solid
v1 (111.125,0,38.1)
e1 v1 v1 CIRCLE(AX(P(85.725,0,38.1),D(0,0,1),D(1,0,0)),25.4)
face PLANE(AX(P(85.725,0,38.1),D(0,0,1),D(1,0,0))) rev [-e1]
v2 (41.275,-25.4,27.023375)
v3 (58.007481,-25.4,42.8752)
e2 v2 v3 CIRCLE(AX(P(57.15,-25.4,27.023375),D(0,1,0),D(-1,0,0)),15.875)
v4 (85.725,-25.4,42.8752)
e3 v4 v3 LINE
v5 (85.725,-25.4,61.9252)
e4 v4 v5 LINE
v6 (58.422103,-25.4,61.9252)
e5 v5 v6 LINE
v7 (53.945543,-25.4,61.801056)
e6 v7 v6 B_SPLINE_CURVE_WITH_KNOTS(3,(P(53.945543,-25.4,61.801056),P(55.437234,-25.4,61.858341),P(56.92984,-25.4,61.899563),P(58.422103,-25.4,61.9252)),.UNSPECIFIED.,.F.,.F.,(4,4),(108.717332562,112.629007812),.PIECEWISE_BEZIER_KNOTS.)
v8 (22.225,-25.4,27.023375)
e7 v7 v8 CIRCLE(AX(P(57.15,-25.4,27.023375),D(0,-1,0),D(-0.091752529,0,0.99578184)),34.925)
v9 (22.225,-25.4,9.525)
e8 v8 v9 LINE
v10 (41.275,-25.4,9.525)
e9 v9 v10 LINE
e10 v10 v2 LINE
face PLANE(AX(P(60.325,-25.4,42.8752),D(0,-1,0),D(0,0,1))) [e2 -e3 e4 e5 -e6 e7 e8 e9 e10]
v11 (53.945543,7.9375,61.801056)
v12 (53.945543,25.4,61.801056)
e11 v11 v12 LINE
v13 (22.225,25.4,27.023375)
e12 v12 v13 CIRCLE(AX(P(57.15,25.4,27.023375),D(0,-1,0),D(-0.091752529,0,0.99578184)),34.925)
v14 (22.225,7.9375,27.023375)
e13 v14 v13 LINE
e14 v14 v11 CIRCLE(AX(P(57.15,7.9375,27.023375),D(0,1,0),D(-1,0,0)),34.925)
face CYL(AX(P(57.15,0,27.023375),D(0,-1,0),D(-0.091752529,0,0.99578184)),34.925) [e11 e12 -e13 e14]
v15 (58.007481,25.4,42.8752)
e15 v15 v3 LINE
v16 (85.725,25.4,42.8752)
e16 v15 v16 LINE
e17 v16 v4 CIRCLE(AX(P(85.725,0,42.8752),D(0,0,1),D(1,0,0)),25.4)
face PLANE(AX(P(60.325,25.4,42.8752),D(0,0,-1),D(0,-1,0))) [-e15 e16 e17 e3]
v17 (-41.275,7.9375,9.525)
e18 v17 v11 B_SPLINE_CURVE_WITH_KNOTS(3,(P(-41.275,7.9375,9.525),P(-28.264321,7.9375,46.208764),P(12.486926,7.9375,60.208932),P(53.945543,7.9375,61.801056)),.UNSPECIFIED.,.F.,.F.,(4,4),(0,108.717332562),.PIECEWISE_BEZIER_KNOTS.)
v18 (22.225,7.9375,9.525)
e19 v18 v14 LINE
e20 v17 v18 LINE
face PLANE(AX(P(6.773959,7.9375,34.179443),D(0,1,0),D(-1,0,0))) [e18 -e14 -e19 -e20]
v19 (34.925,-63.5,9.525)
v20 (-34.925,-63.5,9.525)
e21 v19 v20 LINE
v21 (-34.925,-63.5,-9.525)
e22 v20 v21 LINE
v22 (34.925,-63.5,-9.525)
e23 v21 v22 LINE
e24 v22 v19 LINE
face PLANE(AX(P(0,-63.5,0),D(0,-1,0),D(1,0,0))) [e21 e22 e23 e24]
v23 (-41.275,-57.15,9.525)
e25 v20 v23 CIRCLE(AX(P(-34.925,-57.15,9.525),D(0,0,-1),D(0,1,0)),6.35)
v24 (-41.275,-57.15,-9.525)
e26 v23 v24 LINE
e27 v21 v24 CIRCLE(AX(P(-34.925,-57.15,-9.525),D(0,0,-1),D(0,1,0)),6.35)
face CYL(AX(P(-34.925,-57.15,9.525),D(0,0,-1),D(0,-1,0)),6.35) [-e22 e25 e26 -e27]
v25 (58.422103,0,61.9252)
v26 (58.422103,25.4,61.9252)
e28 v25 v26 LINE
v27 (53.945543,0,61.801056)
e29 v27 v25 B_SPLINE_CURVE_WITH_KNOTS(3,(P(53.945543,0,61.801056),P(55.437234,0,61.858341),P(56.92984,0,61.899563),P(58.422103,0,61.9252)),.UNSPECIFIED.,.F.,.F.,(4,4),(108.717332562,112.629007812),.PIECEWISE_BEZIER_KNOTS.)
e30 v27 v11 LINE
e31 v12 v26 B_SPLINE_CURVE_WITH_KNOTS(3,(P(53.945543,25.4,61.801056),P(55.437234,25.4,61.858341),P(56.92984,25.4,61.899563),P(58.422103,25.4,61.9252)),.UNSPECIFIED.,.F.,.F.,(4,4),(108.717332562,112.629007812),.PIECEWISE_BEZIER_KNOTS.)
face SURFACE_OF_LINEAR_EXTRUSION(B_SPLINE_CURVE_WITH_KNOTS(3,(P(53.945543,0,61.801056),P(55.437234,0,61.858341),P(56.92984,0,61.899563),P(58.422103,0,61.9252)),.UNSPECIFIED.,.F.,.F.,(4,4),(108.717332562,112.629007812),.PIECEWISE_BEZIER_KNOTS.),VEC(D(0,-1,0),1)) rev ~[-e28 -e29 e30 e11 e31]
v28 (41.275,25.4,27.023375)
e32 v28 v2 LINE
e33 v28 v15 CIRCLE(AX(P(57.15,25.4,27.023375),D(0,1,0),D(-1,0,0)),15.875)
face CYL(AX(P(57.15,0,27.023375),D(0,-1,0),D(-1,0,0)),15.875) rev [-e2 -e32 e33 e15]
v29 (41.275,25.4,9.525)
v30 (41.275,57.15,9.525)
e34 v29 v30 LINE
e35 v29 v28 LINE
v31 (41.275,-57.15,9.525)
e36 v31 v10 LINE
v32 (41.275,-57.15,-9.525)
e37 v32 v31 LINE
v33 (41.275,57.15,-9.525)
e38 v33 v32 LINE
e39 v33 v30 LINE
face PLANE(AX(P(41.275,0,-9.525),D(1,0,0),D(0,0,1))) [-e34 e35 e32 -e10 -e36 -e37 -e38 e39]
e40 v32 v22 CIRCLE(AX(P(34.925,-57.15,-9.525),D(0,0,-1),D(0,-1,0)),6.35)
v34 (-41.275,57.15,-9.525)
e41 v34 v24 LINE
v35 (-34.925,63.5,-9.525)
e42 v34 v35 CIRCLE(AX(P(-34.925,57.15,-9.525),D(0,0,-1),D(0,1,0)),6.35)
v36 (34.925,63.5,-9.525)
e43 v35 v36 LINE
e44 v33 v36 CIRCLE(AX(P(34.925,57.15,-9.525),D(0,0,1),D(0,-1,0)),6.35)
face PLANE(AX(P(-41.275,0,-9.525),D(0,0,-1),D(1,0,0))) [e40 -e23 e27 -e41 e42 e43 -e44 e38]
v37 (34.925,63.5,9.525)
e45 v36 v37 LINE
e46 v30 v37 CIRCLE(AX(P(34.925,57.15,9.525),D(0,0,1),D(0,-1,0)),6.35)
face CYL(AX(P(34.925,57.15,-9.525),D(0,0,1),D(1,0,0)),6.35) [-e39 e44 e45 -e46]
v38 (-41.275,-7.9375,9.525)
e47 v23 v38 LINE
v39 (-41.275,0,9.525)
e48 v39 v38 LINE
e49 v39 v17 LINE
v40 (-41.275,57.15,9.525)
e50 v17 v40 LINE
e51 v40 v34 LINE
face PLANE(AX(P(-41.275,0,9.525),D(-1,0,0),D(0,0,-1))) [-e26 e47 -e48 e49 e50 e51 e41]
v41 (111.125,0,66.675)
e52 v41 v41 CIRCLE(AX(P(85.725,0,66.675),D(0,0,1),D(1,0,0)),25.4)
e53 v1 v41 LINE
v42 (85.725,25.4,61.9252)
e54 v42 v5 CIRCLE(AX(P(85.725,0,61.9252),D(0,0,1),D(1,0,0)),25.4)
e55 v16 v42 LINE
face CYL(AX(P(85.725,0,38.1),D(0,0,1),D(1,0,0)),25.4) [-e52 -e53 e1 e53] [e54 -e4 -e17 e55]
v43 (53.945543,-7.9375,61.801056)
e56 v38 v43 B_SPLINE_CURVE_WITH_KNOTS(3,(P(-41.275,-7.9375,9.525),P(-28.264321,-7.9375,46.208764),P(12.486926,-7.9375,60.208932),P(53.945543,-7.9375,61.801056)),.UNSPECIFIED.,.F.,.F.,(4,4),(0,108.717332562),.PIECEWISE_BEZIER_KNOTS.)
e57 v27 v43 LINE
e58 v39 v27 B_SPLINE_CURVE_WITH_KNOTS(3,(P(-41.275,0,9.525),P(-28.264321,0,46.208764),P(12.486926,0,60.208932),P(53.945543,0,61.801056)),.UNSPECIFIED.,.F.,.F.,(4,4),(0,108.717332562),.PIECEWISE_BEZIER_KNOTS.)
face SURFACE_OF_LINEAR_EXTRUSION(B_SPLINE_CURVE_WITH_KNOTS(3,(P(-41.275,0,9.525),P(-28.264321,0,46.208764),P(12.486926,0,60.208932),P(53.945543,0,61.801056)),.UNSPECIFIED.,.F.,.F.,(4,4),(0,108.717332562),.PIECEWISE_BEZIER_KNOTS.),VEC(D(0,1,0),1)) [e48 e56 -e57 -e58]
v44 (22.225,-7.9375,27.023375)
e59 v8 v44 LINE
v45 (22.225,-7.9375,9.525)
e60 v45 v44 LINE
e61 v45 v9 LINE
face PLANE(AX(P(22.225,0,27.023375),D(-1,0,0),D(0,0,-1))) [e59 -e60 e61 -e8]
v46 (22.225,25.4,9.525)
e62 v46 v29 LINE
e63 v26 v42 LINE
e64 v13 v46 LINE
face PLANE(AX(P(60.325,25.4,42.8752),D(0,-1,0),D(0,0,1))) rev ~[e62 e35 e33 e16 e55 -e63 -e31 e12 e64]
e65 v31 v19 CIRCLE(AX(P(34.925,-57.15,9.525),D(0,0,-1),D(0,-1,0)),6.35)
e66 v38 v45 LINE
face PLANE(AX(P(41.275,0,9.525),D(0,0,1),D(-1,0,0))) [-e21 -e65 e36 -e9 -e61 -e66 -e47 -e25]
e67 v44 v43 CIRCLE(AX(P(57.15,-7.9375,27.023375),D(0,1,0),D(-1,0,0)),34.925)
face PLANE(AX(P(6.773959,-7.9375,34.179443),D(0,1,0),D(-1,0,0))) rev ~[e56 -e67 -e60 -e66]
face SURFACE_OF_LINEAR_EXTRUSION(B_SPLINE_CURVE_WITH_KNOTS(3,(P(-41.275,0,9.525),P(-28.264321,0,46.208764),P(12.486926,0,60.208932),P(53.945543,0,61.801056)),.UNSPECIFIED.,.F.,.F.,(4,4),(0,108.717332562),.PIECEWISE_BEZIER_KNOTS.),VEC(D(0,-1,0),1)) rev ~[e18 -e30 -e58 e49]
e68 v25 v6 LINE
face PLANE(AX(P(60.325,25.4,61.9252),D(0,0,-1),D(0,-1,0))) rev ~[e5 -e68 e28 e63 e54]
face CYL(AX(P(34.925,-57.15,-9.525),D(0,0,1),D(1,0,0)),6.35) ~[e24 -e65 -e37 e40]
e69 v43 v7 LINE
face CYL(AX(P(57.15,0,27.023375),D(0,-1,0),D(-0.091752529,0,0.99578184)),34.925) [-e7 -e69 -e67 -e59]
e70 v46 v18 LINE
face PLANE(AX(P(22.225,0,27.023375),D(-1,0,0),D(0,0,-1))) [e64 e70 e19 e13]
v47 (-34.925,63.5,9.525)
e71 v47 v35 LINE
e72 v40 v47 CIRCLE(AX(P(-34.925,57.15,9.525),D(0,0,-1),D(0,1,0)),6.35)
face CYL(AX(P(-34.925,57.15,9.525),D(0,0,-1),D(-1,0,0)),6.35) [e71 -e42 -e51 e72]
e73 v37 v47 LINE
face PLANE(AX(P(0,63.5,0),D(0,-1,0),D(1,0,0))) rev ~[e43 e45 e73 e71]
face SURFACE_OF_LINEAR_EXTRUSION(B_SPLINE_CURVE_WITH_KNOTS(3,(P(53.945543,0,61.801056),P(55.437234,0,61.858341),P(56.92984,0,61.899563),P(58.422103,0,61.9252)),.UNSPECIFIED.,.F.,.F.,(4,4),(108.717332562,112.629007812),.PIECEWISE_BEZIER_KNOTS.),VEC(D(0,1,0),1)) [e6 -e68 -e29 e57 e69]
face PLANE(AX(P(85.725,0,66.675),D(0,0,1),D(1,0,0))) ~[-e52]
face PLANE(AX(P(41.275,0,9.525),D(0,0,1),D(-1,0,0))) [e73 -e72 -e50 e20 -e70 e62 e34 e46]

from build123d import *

# Parameters (mm, degrees)
F1_DEPTH = 63.5
F2_DEPTH = 25.4
F3_DEPTH = 7.9375
F4_DEPTH = 25.4
F0_W     = 25.4
F0_H     = 4.7498
F0_H_2   = 4.7752
F6_R     = 6.35


with BuildPart() as f1:
    # F0 (on Front) → F1 (new body, symmetric)
    with BuildSketch(Plane.XZ):
        Polygon((22.225, 9.525), (-41.275, 9.525), (-41.275, -9.525), (41.275, -9.525), (41.275, 9.525), align=None)
    extrude(amount=F1_DEPTH, both=True)

    # F0 (on Front) → F2 (join, symmetric)
    with BuildSketch(Plane.XZ):
        with BuildLine():
            Line((22.225, 27.0233751515), (22.225, 9.525))
            Line((22.225, 9.525), (41.275, 9.525))
            Line((41.275, 9.525), (41.275, 27.0233751515))
            ThreePointArc((41.275, 27.0233751515), (46.232053506, 38.5478738111), (58.0074811786, 42.8752))
            Line((58.0074811786, 42.8752), (60.325, 42.8752))
            Line((60.325, 42.8752), (60.325, 61.9252))
            Line((60.325, 61.9252), (58.4221034718, 61.9252))
            add(Edge.make_bspline(
                [(53.9455429382, 61.8010559243), (55.4372337649, 61.858340914), (56.9298403376, 61.8995627303), (58.4221034718, 61.9252)],
                knots=[108.7173325618, 108.7173325618, 108.7173325618, 108.7173325618, 112.6290078119, 112.6290078119, 112.6290078119, 112.6290078119], degree=3))
            ThreePointArc((53.9455429382, 61.8010559243), (31.3462087293, 50.5588798425), (22.225, 27.0233751515))
        make_face()
    extrude(amount=F2_DEPTH, both=True)

    # F0 (on Front) → F3 (join, symmetric)
    with BuildSketch(Plane.XZ):
        with BuildLine():
            add(Edge.make_bspline(
                [(-41.275, 9.525), (-28.2643212455, 46.2087638667), (12.486925514, 60.2089321217), (53.9455429382, 61.8010559243)],
                knots=[0, 0, 0, 0, 108.7173325618, 108.7173325618, 108.7173325618, 108.7173325618], degree=3))
            Line((-41.275, 9.525), (22.225, 9.525))
            Line((22.225, 9.525), (22.225, 27.0233751515))
            ThreePointArc((22.225, 27.0233751515), (31.3462087293, 50.5588798425), (53.9455429382, 61.8010559243))
        make_face()
    extrude(amount=F3_DEPTH, both=True)

    # F4 (add): a face of the model
    f4_faces = [f1.faces().sort_by_distance(p)[0] for p in [
        (60.325, 0, 52.4002),
    ]]
    extrude(f4_faces, amount=F4_DEPTH)

    # F0 (on Front) → F5 (revolve)
    with BuildSketch(Plane.XZ):
        with Locations((98.425, 64.3001)):
            Rectangle(F0_W, F0_H)
        Polygon((111.125, 61.9252), (85.725, 61.9252), (85.725, 52.3875), (85.725, 42.8752), (111.125, 42.8752), align=None)
        with Locations((98.425, 40.4876)):
            Rectangle(F0_W, F0_H_2)
    revolve(axis=Axis((85.725, 0, 52.3875), (0, 0, 1)))

    # F6
    f6_edges = [f1.edges().sort_by_distance(p)[0] for p in [
        (41.275, -63.5, 0),
        (-41.275, -63.5, 0),
        (41.275, 63.5, 0),
        (-41.275, 63.5, 0),
    ]]
    fillet(f6_edges, radius=F6_R)


solid = f1.part
